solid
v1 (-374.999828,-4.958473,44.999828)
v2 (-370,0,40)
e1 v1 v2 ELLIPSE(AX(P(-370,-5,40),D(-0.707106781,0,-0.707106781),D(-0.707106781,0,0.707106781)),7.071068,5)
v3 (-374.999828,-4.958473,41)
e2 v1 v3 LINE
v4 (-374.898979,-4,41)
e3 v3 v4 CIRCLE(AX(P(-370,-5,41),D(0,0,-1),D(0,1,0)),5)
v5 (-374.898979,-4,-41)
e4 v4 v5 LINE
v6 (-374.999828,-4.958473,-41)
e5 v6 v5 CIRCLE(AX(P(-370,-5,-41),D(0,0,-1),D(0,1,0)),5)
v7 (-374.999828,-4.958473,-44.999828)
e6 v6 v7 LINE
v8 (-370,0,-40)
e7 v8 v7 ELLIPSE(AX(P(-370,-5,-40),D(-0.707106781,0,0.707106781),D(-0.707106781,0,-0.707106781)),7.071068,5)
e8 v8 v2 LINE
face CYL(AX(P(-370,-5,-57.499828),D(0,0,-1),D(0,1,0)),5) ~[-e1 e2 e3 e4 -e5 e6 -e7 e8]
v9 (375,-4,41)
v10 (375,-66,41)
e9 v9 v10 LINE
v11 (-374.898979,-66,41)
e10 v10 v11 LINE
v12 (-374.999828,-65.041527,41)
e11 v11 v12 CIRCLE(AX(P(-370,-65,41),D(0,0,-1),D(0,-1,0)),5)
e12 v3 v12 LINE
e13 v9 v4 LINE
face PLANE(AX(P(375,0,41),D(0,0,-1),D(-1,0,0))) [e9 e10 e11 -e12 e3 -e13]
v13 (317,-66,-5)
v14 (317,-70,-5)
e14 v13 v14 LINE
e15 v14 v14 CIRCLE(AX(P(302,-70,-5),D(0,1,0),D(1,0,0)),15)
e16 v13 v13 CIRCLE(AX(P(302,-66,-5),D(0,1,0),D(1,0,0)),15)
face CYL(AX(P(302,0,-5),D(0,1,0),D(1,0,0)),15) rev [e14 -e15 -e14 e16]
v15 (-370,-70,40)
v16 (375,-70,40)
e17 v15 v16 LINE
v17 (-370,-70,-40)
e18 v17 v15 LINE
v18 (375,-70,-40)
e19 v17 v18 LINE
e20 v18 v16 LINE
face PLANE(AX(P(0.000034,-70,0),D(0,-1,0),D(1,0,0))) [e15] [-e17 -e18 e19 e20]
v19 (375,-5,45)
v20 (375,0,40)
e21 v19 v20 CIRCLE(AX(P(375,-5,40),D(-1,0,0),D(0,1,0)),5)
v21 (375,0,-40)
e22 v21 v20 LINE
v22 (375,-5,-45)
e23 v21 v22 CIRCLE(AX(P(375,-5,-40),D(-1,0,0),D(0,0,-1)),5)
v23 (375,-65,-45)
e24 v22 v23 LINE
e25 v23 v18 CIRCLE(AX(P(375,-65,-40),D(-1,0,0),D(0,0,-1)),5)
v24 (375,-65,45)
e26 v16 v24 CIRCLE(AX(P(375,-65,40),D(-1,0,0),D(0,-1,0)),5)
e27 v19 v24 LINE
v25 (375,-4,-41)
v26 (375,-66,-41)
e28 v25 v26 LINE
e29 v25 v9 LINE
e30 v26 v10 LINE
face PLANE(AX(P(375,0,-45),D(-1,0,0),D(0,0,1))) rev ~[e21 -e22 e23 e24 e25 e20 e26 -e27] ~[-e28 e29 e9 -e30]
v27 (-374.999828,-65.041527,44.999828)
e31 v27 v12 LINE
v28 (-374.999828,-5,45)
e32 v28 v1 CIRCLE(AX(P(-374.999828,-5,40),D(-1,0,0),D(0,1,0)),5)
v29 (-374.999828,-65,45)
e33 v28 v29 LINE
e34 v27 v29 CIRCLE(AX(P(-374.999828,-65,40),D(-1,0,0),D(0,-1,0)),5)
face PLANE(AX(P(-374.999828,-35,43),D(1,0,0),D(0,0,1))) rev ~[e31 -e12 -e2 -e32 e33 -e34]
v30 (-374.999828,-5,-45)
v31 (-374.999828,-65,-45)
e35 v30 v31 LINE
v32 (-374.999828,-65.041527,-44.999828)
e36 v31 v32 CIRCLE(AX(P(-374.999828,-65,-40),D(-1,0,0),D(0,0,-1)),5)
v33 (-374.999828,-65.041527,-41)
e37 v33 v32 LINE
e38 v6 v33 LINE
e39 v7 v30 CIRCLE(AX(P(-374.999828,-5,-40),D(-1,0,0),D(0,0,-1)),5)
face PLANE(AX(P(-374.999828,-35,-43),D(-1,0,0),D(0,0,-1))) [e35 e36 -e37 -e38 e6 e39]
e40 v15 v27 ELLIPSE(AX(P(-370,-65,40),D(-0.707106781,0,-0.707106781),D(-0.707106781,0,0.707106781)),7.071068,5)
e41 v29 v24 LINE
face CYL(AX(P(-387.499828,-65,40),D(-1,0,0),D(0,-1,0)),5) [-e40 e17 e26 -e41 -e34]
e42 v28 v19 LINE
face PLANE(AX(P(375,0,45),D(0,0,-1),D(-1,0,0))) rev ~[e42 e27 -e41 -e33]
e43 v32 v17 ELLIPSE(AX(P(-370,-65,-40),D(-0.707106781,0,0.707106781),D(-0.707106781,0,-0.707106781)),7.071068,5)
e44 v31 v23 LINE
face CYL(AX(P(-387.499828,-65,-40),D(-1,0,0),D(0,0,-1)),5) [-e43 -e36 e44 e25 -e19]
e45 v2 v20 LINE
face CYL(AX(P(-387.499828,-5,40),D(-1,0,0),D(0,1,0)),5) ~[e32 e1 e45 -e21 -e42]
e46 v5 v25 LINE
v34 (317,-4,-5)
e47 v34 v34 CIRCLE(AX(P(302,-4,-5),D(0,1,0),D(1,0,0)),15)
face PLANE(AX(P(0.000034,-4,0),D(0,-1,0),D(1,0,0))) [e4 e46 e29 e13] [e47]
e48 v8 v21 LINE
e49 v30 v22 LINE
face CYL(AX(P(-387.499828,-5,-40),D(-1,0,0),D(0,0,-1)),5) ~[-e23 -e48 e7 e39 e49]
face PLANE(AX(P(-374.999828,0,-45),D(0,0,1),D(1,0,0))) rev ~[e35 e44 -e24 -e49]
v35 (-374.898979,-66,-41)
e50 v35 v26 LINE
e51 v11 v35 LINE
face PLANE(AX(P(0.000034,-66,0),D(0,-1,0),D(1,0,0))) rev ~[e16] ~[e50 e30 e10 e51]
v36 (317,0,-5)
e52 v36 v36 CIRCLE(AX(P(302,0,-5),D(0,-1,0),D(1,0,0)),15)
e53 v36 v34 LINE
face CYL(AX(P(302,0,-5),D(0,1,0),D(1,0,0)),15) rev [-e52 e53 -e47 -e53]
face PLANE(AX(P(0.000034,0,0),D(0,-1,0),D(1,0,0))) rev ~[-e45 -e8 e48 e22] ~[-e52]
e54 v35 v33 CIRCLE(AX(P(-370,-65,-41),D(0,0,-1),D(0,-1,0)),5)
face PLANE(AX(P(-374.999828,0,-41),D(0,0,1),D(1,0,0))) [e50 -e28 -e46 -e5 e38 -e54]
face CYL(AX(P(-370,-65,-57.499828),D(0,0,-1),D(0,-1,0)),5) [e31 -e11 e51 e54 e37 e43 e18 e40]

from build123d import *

# Parameters (mm, degrees)
F1_DEPTH     = 70
F2_T         = 4
F3_T1_DEPTH  = 774.9998275448
F3_T3_DEPTH  = 114.9996550895
F3_T6_ANGLE  = 90.0000000944
F3_T8_ANGLE  = 89.9999999363
F3_T10_ANGLE = 90.0000000944
F3_T12_ANGLE = 89.9999999363
F4_R         = 15
F5_DEPTH     = 70.001


# Not quite as in the source:
# - a fillet or chamfer that OpenCascade refuses, or shapes differently, is made with other operations: its cross-section is extruded or revolved along the edge and cut away or added
# - a shell that OpenCascade refuses in one call is made with other operations: the cavity is built on its own and cut out


with BuildPart() as f1:
    # F0 (on Front) → F1 (new body)
    with BuildSketch(Plane.XZ):
        with BuildLine():
            Line((-374.9998275448, -45), (375, -45))
            Line((375, -45), (375, 45))
            Line((375, 45), (-374.9998275448, 45))
            ThreePointArc((-374.9998275448, 45), (-374.999949489, 44.999949489), (-375, 44.9998275448))
            Line((-375, 44.9998275448), (-375, -44.9998275448))
            ThreePointArc((-375, -44.9998275448), (-374.999949489, -44.999949489), (-374.9998275448, -45))
        make_face()
    extrude(amount=F1_DEPTH)

    # F2: shell of thickness 4, made by hand


with BuildPart() as f2_core1:
    # F2_t2: copy of F1
    add(f1.part)

    # the walls: a layer under each face that stays
    f2_faces = [f2_core1.faces().sort_by_distance(p)[0] for p in [
        (8.62276e-05, -35, -45),
        (8.62276e-05, -35, 45),
        (0, 0, 0),
        (0, -70, 0),
    ]]
    thicken(f2_faces, amount=-F2_T, mode=Mode.SUBTRACT)


with BuildPart() as f1_1:
    add(f1.part)

    # what is left inside the walls is the cavity
    f2_cavity = [f2_core1.part.solids().sort_by_distance(p)[0] for p in [
        (0, -4.04, -15),
    ]]
    add(f2_cavity, mode=Mode.SUBTRACT)

    # F3: fillet of radius 5 on 4 edges, made by hand

    # F3_s2 → F3_t1 (cut)
    with BuildSketch(Plane.YZ.offset(-387.4998275448)):
        with BuildLine():
            ThreePointArc((-70, 40), (-68.5355339059, 43.5355339059), (-65, 45))
            Line((-65, 45), (-70, 45))
            Line((-70, 45), (-70, 40))
        make_face()
        with BuildLine():
            ThreePointArc((0, 40), (-1.4644660941, 43.5355339059), (-5, 45))
            Line((-5, 45), (0, 45))
            Line((0, 45), (0, 40))
        make_face()
        with BuildLine():
            ThreePointArc((-5, -45), (-1.4644660941, -43.5355339059), (0, -40))
            Line((0, -40), (0, -45))
            Line((0, -45), (-5, -45))
        make_face()
        with BuildLine():
            ThreePointArc((-65, -45), (-68.5355339059, -43.5355339059), (-70, -40))
            Line((-70, -40), (-70, -45))
            Line((-70, -45), (-65, -45))
        make_face()
    extrude(amount=F3_T1_DEPTH, mode=Mode.SUBTRACT)

    # F3_s4 → F3_t3 (cut)
    with BuildSketch(Plane.XY.offset(-57.4998275448)):
        with BuildLine():
            ThreePointArc((-370, -70), (-373.5355339059, -68.5355339059), (-375, -65))
            Line((-375, -65), (-375, -70))
            Line((-375, -70), (-370, -70))
        make_face()
        with BuildLine():
            ThreePointArc((-370, 0), (-373.5355339059, -1.4644660941), (-375, -5))
            Line((-375, -5), (-375, 0))
            Line((-375, 0), (-370, 0))
        make_face()
    extrude(amount=F3_T3_DEPTH, mode=Mode.SUBTRACT)

    # F3_s5 → F3_t6 (revolve, cut)
    with BuildSketch(Plane.XY.offset(-44.9998275448)):
        with BuildLine():
            ThreePointArc((-375, -65), (-374.999956886, -65.0207638646), (-374.9998275448, -65.0415273711))
            Line((-374.9998275448, -65.0415273711), (-374.9998275448, -70))
            Line((-374.9998275448, -70), (-375, -70))
            Line((-375, -70), (-375, -65))
        make_face()
    revolve(axis=Axis((-374.9998275448, -70, -44.9998275448), (0, -1, 0)), revolution_arc=F3_T6_ANGLE, mode=Mode.SUBTRACT)

    # F3_s7 → F3_t8 (revolve, cut)
    with BuildSketch(Plane.YZ.offset(-374.9998275448)):
        with BuildLine():
            ThreePointArc((-65.0415273711, 44.9998275448), (-65.0207638646, 44.999956886), (-65, 45))
            Line((-65, 45), (-70, 45))
            Line((-70, 45), (-70, 44.9998275448))
            Line((-70, 44.9998275448), (-65.0415273711, 44.9998275448))
        make_face()
    revolve(axis=Axis((-374.9998275448, -70, 44.9998275448), (0, -1, 0)), revolution_arc=F3_T8_ANGLE, mode=Mode.SUBTRACT)

    # F3_s9 → F3_t10 (revolve, cut)
    with BuildSketch(Plane.XY.offset(-44.9998275448)):
        with BuildLine():
            ThreePointArc((-375, -5), (-374.999956886, -4.9792361354), (-374.9998275448, -4.9584726289))
            Line((-374.9998275448, -4.9584726289), (-374.9998275448, 0))
            Line((-374.9998275448, 0), (-375, 0))
            Line((-375, 0), (-375, -5))
        make_face()
    revolve(axis=Axis((-374.9998275448, 0, -44.9998275448), (0, -1, 0)), revolution_arc=F3_T10_ANGLE, mode=Mode.SUBTRACT)

    # F3_s11 → F3_t12 (revolve, cut)
    with BuildSketch(Plane.YZ.offset(-374.9998275448)):
        with BuildLine():
            ThreePointArc((-4.9584726289, 44.9998275448), (-4.9792361354, 44.999956886), (-5, 45))
            Line((-5, 45), (0, 45))
            Line((0, 45), (0, 44.9998275448))
            Line((0, 44.9998275448), (-4.9584726289, 44.9998275448))
        make_face()
    revolve(axis=Axis((-374.9998275448, 0, 44.9998275448), (0, -1, 0)), revolution_arc=F3_T12_ANGLE, mode=Mode.SUBTRACT)

    # F4 (on Front) → F5 (cut, through all)
    with BuildSketch(Plane.XZ):
        with Locations((302, -5)):
            Circle(F4_R)
    extrude(amount=F5_DEPTH, mode=Mode.SUBTRACT)


solid = f1_1.part
